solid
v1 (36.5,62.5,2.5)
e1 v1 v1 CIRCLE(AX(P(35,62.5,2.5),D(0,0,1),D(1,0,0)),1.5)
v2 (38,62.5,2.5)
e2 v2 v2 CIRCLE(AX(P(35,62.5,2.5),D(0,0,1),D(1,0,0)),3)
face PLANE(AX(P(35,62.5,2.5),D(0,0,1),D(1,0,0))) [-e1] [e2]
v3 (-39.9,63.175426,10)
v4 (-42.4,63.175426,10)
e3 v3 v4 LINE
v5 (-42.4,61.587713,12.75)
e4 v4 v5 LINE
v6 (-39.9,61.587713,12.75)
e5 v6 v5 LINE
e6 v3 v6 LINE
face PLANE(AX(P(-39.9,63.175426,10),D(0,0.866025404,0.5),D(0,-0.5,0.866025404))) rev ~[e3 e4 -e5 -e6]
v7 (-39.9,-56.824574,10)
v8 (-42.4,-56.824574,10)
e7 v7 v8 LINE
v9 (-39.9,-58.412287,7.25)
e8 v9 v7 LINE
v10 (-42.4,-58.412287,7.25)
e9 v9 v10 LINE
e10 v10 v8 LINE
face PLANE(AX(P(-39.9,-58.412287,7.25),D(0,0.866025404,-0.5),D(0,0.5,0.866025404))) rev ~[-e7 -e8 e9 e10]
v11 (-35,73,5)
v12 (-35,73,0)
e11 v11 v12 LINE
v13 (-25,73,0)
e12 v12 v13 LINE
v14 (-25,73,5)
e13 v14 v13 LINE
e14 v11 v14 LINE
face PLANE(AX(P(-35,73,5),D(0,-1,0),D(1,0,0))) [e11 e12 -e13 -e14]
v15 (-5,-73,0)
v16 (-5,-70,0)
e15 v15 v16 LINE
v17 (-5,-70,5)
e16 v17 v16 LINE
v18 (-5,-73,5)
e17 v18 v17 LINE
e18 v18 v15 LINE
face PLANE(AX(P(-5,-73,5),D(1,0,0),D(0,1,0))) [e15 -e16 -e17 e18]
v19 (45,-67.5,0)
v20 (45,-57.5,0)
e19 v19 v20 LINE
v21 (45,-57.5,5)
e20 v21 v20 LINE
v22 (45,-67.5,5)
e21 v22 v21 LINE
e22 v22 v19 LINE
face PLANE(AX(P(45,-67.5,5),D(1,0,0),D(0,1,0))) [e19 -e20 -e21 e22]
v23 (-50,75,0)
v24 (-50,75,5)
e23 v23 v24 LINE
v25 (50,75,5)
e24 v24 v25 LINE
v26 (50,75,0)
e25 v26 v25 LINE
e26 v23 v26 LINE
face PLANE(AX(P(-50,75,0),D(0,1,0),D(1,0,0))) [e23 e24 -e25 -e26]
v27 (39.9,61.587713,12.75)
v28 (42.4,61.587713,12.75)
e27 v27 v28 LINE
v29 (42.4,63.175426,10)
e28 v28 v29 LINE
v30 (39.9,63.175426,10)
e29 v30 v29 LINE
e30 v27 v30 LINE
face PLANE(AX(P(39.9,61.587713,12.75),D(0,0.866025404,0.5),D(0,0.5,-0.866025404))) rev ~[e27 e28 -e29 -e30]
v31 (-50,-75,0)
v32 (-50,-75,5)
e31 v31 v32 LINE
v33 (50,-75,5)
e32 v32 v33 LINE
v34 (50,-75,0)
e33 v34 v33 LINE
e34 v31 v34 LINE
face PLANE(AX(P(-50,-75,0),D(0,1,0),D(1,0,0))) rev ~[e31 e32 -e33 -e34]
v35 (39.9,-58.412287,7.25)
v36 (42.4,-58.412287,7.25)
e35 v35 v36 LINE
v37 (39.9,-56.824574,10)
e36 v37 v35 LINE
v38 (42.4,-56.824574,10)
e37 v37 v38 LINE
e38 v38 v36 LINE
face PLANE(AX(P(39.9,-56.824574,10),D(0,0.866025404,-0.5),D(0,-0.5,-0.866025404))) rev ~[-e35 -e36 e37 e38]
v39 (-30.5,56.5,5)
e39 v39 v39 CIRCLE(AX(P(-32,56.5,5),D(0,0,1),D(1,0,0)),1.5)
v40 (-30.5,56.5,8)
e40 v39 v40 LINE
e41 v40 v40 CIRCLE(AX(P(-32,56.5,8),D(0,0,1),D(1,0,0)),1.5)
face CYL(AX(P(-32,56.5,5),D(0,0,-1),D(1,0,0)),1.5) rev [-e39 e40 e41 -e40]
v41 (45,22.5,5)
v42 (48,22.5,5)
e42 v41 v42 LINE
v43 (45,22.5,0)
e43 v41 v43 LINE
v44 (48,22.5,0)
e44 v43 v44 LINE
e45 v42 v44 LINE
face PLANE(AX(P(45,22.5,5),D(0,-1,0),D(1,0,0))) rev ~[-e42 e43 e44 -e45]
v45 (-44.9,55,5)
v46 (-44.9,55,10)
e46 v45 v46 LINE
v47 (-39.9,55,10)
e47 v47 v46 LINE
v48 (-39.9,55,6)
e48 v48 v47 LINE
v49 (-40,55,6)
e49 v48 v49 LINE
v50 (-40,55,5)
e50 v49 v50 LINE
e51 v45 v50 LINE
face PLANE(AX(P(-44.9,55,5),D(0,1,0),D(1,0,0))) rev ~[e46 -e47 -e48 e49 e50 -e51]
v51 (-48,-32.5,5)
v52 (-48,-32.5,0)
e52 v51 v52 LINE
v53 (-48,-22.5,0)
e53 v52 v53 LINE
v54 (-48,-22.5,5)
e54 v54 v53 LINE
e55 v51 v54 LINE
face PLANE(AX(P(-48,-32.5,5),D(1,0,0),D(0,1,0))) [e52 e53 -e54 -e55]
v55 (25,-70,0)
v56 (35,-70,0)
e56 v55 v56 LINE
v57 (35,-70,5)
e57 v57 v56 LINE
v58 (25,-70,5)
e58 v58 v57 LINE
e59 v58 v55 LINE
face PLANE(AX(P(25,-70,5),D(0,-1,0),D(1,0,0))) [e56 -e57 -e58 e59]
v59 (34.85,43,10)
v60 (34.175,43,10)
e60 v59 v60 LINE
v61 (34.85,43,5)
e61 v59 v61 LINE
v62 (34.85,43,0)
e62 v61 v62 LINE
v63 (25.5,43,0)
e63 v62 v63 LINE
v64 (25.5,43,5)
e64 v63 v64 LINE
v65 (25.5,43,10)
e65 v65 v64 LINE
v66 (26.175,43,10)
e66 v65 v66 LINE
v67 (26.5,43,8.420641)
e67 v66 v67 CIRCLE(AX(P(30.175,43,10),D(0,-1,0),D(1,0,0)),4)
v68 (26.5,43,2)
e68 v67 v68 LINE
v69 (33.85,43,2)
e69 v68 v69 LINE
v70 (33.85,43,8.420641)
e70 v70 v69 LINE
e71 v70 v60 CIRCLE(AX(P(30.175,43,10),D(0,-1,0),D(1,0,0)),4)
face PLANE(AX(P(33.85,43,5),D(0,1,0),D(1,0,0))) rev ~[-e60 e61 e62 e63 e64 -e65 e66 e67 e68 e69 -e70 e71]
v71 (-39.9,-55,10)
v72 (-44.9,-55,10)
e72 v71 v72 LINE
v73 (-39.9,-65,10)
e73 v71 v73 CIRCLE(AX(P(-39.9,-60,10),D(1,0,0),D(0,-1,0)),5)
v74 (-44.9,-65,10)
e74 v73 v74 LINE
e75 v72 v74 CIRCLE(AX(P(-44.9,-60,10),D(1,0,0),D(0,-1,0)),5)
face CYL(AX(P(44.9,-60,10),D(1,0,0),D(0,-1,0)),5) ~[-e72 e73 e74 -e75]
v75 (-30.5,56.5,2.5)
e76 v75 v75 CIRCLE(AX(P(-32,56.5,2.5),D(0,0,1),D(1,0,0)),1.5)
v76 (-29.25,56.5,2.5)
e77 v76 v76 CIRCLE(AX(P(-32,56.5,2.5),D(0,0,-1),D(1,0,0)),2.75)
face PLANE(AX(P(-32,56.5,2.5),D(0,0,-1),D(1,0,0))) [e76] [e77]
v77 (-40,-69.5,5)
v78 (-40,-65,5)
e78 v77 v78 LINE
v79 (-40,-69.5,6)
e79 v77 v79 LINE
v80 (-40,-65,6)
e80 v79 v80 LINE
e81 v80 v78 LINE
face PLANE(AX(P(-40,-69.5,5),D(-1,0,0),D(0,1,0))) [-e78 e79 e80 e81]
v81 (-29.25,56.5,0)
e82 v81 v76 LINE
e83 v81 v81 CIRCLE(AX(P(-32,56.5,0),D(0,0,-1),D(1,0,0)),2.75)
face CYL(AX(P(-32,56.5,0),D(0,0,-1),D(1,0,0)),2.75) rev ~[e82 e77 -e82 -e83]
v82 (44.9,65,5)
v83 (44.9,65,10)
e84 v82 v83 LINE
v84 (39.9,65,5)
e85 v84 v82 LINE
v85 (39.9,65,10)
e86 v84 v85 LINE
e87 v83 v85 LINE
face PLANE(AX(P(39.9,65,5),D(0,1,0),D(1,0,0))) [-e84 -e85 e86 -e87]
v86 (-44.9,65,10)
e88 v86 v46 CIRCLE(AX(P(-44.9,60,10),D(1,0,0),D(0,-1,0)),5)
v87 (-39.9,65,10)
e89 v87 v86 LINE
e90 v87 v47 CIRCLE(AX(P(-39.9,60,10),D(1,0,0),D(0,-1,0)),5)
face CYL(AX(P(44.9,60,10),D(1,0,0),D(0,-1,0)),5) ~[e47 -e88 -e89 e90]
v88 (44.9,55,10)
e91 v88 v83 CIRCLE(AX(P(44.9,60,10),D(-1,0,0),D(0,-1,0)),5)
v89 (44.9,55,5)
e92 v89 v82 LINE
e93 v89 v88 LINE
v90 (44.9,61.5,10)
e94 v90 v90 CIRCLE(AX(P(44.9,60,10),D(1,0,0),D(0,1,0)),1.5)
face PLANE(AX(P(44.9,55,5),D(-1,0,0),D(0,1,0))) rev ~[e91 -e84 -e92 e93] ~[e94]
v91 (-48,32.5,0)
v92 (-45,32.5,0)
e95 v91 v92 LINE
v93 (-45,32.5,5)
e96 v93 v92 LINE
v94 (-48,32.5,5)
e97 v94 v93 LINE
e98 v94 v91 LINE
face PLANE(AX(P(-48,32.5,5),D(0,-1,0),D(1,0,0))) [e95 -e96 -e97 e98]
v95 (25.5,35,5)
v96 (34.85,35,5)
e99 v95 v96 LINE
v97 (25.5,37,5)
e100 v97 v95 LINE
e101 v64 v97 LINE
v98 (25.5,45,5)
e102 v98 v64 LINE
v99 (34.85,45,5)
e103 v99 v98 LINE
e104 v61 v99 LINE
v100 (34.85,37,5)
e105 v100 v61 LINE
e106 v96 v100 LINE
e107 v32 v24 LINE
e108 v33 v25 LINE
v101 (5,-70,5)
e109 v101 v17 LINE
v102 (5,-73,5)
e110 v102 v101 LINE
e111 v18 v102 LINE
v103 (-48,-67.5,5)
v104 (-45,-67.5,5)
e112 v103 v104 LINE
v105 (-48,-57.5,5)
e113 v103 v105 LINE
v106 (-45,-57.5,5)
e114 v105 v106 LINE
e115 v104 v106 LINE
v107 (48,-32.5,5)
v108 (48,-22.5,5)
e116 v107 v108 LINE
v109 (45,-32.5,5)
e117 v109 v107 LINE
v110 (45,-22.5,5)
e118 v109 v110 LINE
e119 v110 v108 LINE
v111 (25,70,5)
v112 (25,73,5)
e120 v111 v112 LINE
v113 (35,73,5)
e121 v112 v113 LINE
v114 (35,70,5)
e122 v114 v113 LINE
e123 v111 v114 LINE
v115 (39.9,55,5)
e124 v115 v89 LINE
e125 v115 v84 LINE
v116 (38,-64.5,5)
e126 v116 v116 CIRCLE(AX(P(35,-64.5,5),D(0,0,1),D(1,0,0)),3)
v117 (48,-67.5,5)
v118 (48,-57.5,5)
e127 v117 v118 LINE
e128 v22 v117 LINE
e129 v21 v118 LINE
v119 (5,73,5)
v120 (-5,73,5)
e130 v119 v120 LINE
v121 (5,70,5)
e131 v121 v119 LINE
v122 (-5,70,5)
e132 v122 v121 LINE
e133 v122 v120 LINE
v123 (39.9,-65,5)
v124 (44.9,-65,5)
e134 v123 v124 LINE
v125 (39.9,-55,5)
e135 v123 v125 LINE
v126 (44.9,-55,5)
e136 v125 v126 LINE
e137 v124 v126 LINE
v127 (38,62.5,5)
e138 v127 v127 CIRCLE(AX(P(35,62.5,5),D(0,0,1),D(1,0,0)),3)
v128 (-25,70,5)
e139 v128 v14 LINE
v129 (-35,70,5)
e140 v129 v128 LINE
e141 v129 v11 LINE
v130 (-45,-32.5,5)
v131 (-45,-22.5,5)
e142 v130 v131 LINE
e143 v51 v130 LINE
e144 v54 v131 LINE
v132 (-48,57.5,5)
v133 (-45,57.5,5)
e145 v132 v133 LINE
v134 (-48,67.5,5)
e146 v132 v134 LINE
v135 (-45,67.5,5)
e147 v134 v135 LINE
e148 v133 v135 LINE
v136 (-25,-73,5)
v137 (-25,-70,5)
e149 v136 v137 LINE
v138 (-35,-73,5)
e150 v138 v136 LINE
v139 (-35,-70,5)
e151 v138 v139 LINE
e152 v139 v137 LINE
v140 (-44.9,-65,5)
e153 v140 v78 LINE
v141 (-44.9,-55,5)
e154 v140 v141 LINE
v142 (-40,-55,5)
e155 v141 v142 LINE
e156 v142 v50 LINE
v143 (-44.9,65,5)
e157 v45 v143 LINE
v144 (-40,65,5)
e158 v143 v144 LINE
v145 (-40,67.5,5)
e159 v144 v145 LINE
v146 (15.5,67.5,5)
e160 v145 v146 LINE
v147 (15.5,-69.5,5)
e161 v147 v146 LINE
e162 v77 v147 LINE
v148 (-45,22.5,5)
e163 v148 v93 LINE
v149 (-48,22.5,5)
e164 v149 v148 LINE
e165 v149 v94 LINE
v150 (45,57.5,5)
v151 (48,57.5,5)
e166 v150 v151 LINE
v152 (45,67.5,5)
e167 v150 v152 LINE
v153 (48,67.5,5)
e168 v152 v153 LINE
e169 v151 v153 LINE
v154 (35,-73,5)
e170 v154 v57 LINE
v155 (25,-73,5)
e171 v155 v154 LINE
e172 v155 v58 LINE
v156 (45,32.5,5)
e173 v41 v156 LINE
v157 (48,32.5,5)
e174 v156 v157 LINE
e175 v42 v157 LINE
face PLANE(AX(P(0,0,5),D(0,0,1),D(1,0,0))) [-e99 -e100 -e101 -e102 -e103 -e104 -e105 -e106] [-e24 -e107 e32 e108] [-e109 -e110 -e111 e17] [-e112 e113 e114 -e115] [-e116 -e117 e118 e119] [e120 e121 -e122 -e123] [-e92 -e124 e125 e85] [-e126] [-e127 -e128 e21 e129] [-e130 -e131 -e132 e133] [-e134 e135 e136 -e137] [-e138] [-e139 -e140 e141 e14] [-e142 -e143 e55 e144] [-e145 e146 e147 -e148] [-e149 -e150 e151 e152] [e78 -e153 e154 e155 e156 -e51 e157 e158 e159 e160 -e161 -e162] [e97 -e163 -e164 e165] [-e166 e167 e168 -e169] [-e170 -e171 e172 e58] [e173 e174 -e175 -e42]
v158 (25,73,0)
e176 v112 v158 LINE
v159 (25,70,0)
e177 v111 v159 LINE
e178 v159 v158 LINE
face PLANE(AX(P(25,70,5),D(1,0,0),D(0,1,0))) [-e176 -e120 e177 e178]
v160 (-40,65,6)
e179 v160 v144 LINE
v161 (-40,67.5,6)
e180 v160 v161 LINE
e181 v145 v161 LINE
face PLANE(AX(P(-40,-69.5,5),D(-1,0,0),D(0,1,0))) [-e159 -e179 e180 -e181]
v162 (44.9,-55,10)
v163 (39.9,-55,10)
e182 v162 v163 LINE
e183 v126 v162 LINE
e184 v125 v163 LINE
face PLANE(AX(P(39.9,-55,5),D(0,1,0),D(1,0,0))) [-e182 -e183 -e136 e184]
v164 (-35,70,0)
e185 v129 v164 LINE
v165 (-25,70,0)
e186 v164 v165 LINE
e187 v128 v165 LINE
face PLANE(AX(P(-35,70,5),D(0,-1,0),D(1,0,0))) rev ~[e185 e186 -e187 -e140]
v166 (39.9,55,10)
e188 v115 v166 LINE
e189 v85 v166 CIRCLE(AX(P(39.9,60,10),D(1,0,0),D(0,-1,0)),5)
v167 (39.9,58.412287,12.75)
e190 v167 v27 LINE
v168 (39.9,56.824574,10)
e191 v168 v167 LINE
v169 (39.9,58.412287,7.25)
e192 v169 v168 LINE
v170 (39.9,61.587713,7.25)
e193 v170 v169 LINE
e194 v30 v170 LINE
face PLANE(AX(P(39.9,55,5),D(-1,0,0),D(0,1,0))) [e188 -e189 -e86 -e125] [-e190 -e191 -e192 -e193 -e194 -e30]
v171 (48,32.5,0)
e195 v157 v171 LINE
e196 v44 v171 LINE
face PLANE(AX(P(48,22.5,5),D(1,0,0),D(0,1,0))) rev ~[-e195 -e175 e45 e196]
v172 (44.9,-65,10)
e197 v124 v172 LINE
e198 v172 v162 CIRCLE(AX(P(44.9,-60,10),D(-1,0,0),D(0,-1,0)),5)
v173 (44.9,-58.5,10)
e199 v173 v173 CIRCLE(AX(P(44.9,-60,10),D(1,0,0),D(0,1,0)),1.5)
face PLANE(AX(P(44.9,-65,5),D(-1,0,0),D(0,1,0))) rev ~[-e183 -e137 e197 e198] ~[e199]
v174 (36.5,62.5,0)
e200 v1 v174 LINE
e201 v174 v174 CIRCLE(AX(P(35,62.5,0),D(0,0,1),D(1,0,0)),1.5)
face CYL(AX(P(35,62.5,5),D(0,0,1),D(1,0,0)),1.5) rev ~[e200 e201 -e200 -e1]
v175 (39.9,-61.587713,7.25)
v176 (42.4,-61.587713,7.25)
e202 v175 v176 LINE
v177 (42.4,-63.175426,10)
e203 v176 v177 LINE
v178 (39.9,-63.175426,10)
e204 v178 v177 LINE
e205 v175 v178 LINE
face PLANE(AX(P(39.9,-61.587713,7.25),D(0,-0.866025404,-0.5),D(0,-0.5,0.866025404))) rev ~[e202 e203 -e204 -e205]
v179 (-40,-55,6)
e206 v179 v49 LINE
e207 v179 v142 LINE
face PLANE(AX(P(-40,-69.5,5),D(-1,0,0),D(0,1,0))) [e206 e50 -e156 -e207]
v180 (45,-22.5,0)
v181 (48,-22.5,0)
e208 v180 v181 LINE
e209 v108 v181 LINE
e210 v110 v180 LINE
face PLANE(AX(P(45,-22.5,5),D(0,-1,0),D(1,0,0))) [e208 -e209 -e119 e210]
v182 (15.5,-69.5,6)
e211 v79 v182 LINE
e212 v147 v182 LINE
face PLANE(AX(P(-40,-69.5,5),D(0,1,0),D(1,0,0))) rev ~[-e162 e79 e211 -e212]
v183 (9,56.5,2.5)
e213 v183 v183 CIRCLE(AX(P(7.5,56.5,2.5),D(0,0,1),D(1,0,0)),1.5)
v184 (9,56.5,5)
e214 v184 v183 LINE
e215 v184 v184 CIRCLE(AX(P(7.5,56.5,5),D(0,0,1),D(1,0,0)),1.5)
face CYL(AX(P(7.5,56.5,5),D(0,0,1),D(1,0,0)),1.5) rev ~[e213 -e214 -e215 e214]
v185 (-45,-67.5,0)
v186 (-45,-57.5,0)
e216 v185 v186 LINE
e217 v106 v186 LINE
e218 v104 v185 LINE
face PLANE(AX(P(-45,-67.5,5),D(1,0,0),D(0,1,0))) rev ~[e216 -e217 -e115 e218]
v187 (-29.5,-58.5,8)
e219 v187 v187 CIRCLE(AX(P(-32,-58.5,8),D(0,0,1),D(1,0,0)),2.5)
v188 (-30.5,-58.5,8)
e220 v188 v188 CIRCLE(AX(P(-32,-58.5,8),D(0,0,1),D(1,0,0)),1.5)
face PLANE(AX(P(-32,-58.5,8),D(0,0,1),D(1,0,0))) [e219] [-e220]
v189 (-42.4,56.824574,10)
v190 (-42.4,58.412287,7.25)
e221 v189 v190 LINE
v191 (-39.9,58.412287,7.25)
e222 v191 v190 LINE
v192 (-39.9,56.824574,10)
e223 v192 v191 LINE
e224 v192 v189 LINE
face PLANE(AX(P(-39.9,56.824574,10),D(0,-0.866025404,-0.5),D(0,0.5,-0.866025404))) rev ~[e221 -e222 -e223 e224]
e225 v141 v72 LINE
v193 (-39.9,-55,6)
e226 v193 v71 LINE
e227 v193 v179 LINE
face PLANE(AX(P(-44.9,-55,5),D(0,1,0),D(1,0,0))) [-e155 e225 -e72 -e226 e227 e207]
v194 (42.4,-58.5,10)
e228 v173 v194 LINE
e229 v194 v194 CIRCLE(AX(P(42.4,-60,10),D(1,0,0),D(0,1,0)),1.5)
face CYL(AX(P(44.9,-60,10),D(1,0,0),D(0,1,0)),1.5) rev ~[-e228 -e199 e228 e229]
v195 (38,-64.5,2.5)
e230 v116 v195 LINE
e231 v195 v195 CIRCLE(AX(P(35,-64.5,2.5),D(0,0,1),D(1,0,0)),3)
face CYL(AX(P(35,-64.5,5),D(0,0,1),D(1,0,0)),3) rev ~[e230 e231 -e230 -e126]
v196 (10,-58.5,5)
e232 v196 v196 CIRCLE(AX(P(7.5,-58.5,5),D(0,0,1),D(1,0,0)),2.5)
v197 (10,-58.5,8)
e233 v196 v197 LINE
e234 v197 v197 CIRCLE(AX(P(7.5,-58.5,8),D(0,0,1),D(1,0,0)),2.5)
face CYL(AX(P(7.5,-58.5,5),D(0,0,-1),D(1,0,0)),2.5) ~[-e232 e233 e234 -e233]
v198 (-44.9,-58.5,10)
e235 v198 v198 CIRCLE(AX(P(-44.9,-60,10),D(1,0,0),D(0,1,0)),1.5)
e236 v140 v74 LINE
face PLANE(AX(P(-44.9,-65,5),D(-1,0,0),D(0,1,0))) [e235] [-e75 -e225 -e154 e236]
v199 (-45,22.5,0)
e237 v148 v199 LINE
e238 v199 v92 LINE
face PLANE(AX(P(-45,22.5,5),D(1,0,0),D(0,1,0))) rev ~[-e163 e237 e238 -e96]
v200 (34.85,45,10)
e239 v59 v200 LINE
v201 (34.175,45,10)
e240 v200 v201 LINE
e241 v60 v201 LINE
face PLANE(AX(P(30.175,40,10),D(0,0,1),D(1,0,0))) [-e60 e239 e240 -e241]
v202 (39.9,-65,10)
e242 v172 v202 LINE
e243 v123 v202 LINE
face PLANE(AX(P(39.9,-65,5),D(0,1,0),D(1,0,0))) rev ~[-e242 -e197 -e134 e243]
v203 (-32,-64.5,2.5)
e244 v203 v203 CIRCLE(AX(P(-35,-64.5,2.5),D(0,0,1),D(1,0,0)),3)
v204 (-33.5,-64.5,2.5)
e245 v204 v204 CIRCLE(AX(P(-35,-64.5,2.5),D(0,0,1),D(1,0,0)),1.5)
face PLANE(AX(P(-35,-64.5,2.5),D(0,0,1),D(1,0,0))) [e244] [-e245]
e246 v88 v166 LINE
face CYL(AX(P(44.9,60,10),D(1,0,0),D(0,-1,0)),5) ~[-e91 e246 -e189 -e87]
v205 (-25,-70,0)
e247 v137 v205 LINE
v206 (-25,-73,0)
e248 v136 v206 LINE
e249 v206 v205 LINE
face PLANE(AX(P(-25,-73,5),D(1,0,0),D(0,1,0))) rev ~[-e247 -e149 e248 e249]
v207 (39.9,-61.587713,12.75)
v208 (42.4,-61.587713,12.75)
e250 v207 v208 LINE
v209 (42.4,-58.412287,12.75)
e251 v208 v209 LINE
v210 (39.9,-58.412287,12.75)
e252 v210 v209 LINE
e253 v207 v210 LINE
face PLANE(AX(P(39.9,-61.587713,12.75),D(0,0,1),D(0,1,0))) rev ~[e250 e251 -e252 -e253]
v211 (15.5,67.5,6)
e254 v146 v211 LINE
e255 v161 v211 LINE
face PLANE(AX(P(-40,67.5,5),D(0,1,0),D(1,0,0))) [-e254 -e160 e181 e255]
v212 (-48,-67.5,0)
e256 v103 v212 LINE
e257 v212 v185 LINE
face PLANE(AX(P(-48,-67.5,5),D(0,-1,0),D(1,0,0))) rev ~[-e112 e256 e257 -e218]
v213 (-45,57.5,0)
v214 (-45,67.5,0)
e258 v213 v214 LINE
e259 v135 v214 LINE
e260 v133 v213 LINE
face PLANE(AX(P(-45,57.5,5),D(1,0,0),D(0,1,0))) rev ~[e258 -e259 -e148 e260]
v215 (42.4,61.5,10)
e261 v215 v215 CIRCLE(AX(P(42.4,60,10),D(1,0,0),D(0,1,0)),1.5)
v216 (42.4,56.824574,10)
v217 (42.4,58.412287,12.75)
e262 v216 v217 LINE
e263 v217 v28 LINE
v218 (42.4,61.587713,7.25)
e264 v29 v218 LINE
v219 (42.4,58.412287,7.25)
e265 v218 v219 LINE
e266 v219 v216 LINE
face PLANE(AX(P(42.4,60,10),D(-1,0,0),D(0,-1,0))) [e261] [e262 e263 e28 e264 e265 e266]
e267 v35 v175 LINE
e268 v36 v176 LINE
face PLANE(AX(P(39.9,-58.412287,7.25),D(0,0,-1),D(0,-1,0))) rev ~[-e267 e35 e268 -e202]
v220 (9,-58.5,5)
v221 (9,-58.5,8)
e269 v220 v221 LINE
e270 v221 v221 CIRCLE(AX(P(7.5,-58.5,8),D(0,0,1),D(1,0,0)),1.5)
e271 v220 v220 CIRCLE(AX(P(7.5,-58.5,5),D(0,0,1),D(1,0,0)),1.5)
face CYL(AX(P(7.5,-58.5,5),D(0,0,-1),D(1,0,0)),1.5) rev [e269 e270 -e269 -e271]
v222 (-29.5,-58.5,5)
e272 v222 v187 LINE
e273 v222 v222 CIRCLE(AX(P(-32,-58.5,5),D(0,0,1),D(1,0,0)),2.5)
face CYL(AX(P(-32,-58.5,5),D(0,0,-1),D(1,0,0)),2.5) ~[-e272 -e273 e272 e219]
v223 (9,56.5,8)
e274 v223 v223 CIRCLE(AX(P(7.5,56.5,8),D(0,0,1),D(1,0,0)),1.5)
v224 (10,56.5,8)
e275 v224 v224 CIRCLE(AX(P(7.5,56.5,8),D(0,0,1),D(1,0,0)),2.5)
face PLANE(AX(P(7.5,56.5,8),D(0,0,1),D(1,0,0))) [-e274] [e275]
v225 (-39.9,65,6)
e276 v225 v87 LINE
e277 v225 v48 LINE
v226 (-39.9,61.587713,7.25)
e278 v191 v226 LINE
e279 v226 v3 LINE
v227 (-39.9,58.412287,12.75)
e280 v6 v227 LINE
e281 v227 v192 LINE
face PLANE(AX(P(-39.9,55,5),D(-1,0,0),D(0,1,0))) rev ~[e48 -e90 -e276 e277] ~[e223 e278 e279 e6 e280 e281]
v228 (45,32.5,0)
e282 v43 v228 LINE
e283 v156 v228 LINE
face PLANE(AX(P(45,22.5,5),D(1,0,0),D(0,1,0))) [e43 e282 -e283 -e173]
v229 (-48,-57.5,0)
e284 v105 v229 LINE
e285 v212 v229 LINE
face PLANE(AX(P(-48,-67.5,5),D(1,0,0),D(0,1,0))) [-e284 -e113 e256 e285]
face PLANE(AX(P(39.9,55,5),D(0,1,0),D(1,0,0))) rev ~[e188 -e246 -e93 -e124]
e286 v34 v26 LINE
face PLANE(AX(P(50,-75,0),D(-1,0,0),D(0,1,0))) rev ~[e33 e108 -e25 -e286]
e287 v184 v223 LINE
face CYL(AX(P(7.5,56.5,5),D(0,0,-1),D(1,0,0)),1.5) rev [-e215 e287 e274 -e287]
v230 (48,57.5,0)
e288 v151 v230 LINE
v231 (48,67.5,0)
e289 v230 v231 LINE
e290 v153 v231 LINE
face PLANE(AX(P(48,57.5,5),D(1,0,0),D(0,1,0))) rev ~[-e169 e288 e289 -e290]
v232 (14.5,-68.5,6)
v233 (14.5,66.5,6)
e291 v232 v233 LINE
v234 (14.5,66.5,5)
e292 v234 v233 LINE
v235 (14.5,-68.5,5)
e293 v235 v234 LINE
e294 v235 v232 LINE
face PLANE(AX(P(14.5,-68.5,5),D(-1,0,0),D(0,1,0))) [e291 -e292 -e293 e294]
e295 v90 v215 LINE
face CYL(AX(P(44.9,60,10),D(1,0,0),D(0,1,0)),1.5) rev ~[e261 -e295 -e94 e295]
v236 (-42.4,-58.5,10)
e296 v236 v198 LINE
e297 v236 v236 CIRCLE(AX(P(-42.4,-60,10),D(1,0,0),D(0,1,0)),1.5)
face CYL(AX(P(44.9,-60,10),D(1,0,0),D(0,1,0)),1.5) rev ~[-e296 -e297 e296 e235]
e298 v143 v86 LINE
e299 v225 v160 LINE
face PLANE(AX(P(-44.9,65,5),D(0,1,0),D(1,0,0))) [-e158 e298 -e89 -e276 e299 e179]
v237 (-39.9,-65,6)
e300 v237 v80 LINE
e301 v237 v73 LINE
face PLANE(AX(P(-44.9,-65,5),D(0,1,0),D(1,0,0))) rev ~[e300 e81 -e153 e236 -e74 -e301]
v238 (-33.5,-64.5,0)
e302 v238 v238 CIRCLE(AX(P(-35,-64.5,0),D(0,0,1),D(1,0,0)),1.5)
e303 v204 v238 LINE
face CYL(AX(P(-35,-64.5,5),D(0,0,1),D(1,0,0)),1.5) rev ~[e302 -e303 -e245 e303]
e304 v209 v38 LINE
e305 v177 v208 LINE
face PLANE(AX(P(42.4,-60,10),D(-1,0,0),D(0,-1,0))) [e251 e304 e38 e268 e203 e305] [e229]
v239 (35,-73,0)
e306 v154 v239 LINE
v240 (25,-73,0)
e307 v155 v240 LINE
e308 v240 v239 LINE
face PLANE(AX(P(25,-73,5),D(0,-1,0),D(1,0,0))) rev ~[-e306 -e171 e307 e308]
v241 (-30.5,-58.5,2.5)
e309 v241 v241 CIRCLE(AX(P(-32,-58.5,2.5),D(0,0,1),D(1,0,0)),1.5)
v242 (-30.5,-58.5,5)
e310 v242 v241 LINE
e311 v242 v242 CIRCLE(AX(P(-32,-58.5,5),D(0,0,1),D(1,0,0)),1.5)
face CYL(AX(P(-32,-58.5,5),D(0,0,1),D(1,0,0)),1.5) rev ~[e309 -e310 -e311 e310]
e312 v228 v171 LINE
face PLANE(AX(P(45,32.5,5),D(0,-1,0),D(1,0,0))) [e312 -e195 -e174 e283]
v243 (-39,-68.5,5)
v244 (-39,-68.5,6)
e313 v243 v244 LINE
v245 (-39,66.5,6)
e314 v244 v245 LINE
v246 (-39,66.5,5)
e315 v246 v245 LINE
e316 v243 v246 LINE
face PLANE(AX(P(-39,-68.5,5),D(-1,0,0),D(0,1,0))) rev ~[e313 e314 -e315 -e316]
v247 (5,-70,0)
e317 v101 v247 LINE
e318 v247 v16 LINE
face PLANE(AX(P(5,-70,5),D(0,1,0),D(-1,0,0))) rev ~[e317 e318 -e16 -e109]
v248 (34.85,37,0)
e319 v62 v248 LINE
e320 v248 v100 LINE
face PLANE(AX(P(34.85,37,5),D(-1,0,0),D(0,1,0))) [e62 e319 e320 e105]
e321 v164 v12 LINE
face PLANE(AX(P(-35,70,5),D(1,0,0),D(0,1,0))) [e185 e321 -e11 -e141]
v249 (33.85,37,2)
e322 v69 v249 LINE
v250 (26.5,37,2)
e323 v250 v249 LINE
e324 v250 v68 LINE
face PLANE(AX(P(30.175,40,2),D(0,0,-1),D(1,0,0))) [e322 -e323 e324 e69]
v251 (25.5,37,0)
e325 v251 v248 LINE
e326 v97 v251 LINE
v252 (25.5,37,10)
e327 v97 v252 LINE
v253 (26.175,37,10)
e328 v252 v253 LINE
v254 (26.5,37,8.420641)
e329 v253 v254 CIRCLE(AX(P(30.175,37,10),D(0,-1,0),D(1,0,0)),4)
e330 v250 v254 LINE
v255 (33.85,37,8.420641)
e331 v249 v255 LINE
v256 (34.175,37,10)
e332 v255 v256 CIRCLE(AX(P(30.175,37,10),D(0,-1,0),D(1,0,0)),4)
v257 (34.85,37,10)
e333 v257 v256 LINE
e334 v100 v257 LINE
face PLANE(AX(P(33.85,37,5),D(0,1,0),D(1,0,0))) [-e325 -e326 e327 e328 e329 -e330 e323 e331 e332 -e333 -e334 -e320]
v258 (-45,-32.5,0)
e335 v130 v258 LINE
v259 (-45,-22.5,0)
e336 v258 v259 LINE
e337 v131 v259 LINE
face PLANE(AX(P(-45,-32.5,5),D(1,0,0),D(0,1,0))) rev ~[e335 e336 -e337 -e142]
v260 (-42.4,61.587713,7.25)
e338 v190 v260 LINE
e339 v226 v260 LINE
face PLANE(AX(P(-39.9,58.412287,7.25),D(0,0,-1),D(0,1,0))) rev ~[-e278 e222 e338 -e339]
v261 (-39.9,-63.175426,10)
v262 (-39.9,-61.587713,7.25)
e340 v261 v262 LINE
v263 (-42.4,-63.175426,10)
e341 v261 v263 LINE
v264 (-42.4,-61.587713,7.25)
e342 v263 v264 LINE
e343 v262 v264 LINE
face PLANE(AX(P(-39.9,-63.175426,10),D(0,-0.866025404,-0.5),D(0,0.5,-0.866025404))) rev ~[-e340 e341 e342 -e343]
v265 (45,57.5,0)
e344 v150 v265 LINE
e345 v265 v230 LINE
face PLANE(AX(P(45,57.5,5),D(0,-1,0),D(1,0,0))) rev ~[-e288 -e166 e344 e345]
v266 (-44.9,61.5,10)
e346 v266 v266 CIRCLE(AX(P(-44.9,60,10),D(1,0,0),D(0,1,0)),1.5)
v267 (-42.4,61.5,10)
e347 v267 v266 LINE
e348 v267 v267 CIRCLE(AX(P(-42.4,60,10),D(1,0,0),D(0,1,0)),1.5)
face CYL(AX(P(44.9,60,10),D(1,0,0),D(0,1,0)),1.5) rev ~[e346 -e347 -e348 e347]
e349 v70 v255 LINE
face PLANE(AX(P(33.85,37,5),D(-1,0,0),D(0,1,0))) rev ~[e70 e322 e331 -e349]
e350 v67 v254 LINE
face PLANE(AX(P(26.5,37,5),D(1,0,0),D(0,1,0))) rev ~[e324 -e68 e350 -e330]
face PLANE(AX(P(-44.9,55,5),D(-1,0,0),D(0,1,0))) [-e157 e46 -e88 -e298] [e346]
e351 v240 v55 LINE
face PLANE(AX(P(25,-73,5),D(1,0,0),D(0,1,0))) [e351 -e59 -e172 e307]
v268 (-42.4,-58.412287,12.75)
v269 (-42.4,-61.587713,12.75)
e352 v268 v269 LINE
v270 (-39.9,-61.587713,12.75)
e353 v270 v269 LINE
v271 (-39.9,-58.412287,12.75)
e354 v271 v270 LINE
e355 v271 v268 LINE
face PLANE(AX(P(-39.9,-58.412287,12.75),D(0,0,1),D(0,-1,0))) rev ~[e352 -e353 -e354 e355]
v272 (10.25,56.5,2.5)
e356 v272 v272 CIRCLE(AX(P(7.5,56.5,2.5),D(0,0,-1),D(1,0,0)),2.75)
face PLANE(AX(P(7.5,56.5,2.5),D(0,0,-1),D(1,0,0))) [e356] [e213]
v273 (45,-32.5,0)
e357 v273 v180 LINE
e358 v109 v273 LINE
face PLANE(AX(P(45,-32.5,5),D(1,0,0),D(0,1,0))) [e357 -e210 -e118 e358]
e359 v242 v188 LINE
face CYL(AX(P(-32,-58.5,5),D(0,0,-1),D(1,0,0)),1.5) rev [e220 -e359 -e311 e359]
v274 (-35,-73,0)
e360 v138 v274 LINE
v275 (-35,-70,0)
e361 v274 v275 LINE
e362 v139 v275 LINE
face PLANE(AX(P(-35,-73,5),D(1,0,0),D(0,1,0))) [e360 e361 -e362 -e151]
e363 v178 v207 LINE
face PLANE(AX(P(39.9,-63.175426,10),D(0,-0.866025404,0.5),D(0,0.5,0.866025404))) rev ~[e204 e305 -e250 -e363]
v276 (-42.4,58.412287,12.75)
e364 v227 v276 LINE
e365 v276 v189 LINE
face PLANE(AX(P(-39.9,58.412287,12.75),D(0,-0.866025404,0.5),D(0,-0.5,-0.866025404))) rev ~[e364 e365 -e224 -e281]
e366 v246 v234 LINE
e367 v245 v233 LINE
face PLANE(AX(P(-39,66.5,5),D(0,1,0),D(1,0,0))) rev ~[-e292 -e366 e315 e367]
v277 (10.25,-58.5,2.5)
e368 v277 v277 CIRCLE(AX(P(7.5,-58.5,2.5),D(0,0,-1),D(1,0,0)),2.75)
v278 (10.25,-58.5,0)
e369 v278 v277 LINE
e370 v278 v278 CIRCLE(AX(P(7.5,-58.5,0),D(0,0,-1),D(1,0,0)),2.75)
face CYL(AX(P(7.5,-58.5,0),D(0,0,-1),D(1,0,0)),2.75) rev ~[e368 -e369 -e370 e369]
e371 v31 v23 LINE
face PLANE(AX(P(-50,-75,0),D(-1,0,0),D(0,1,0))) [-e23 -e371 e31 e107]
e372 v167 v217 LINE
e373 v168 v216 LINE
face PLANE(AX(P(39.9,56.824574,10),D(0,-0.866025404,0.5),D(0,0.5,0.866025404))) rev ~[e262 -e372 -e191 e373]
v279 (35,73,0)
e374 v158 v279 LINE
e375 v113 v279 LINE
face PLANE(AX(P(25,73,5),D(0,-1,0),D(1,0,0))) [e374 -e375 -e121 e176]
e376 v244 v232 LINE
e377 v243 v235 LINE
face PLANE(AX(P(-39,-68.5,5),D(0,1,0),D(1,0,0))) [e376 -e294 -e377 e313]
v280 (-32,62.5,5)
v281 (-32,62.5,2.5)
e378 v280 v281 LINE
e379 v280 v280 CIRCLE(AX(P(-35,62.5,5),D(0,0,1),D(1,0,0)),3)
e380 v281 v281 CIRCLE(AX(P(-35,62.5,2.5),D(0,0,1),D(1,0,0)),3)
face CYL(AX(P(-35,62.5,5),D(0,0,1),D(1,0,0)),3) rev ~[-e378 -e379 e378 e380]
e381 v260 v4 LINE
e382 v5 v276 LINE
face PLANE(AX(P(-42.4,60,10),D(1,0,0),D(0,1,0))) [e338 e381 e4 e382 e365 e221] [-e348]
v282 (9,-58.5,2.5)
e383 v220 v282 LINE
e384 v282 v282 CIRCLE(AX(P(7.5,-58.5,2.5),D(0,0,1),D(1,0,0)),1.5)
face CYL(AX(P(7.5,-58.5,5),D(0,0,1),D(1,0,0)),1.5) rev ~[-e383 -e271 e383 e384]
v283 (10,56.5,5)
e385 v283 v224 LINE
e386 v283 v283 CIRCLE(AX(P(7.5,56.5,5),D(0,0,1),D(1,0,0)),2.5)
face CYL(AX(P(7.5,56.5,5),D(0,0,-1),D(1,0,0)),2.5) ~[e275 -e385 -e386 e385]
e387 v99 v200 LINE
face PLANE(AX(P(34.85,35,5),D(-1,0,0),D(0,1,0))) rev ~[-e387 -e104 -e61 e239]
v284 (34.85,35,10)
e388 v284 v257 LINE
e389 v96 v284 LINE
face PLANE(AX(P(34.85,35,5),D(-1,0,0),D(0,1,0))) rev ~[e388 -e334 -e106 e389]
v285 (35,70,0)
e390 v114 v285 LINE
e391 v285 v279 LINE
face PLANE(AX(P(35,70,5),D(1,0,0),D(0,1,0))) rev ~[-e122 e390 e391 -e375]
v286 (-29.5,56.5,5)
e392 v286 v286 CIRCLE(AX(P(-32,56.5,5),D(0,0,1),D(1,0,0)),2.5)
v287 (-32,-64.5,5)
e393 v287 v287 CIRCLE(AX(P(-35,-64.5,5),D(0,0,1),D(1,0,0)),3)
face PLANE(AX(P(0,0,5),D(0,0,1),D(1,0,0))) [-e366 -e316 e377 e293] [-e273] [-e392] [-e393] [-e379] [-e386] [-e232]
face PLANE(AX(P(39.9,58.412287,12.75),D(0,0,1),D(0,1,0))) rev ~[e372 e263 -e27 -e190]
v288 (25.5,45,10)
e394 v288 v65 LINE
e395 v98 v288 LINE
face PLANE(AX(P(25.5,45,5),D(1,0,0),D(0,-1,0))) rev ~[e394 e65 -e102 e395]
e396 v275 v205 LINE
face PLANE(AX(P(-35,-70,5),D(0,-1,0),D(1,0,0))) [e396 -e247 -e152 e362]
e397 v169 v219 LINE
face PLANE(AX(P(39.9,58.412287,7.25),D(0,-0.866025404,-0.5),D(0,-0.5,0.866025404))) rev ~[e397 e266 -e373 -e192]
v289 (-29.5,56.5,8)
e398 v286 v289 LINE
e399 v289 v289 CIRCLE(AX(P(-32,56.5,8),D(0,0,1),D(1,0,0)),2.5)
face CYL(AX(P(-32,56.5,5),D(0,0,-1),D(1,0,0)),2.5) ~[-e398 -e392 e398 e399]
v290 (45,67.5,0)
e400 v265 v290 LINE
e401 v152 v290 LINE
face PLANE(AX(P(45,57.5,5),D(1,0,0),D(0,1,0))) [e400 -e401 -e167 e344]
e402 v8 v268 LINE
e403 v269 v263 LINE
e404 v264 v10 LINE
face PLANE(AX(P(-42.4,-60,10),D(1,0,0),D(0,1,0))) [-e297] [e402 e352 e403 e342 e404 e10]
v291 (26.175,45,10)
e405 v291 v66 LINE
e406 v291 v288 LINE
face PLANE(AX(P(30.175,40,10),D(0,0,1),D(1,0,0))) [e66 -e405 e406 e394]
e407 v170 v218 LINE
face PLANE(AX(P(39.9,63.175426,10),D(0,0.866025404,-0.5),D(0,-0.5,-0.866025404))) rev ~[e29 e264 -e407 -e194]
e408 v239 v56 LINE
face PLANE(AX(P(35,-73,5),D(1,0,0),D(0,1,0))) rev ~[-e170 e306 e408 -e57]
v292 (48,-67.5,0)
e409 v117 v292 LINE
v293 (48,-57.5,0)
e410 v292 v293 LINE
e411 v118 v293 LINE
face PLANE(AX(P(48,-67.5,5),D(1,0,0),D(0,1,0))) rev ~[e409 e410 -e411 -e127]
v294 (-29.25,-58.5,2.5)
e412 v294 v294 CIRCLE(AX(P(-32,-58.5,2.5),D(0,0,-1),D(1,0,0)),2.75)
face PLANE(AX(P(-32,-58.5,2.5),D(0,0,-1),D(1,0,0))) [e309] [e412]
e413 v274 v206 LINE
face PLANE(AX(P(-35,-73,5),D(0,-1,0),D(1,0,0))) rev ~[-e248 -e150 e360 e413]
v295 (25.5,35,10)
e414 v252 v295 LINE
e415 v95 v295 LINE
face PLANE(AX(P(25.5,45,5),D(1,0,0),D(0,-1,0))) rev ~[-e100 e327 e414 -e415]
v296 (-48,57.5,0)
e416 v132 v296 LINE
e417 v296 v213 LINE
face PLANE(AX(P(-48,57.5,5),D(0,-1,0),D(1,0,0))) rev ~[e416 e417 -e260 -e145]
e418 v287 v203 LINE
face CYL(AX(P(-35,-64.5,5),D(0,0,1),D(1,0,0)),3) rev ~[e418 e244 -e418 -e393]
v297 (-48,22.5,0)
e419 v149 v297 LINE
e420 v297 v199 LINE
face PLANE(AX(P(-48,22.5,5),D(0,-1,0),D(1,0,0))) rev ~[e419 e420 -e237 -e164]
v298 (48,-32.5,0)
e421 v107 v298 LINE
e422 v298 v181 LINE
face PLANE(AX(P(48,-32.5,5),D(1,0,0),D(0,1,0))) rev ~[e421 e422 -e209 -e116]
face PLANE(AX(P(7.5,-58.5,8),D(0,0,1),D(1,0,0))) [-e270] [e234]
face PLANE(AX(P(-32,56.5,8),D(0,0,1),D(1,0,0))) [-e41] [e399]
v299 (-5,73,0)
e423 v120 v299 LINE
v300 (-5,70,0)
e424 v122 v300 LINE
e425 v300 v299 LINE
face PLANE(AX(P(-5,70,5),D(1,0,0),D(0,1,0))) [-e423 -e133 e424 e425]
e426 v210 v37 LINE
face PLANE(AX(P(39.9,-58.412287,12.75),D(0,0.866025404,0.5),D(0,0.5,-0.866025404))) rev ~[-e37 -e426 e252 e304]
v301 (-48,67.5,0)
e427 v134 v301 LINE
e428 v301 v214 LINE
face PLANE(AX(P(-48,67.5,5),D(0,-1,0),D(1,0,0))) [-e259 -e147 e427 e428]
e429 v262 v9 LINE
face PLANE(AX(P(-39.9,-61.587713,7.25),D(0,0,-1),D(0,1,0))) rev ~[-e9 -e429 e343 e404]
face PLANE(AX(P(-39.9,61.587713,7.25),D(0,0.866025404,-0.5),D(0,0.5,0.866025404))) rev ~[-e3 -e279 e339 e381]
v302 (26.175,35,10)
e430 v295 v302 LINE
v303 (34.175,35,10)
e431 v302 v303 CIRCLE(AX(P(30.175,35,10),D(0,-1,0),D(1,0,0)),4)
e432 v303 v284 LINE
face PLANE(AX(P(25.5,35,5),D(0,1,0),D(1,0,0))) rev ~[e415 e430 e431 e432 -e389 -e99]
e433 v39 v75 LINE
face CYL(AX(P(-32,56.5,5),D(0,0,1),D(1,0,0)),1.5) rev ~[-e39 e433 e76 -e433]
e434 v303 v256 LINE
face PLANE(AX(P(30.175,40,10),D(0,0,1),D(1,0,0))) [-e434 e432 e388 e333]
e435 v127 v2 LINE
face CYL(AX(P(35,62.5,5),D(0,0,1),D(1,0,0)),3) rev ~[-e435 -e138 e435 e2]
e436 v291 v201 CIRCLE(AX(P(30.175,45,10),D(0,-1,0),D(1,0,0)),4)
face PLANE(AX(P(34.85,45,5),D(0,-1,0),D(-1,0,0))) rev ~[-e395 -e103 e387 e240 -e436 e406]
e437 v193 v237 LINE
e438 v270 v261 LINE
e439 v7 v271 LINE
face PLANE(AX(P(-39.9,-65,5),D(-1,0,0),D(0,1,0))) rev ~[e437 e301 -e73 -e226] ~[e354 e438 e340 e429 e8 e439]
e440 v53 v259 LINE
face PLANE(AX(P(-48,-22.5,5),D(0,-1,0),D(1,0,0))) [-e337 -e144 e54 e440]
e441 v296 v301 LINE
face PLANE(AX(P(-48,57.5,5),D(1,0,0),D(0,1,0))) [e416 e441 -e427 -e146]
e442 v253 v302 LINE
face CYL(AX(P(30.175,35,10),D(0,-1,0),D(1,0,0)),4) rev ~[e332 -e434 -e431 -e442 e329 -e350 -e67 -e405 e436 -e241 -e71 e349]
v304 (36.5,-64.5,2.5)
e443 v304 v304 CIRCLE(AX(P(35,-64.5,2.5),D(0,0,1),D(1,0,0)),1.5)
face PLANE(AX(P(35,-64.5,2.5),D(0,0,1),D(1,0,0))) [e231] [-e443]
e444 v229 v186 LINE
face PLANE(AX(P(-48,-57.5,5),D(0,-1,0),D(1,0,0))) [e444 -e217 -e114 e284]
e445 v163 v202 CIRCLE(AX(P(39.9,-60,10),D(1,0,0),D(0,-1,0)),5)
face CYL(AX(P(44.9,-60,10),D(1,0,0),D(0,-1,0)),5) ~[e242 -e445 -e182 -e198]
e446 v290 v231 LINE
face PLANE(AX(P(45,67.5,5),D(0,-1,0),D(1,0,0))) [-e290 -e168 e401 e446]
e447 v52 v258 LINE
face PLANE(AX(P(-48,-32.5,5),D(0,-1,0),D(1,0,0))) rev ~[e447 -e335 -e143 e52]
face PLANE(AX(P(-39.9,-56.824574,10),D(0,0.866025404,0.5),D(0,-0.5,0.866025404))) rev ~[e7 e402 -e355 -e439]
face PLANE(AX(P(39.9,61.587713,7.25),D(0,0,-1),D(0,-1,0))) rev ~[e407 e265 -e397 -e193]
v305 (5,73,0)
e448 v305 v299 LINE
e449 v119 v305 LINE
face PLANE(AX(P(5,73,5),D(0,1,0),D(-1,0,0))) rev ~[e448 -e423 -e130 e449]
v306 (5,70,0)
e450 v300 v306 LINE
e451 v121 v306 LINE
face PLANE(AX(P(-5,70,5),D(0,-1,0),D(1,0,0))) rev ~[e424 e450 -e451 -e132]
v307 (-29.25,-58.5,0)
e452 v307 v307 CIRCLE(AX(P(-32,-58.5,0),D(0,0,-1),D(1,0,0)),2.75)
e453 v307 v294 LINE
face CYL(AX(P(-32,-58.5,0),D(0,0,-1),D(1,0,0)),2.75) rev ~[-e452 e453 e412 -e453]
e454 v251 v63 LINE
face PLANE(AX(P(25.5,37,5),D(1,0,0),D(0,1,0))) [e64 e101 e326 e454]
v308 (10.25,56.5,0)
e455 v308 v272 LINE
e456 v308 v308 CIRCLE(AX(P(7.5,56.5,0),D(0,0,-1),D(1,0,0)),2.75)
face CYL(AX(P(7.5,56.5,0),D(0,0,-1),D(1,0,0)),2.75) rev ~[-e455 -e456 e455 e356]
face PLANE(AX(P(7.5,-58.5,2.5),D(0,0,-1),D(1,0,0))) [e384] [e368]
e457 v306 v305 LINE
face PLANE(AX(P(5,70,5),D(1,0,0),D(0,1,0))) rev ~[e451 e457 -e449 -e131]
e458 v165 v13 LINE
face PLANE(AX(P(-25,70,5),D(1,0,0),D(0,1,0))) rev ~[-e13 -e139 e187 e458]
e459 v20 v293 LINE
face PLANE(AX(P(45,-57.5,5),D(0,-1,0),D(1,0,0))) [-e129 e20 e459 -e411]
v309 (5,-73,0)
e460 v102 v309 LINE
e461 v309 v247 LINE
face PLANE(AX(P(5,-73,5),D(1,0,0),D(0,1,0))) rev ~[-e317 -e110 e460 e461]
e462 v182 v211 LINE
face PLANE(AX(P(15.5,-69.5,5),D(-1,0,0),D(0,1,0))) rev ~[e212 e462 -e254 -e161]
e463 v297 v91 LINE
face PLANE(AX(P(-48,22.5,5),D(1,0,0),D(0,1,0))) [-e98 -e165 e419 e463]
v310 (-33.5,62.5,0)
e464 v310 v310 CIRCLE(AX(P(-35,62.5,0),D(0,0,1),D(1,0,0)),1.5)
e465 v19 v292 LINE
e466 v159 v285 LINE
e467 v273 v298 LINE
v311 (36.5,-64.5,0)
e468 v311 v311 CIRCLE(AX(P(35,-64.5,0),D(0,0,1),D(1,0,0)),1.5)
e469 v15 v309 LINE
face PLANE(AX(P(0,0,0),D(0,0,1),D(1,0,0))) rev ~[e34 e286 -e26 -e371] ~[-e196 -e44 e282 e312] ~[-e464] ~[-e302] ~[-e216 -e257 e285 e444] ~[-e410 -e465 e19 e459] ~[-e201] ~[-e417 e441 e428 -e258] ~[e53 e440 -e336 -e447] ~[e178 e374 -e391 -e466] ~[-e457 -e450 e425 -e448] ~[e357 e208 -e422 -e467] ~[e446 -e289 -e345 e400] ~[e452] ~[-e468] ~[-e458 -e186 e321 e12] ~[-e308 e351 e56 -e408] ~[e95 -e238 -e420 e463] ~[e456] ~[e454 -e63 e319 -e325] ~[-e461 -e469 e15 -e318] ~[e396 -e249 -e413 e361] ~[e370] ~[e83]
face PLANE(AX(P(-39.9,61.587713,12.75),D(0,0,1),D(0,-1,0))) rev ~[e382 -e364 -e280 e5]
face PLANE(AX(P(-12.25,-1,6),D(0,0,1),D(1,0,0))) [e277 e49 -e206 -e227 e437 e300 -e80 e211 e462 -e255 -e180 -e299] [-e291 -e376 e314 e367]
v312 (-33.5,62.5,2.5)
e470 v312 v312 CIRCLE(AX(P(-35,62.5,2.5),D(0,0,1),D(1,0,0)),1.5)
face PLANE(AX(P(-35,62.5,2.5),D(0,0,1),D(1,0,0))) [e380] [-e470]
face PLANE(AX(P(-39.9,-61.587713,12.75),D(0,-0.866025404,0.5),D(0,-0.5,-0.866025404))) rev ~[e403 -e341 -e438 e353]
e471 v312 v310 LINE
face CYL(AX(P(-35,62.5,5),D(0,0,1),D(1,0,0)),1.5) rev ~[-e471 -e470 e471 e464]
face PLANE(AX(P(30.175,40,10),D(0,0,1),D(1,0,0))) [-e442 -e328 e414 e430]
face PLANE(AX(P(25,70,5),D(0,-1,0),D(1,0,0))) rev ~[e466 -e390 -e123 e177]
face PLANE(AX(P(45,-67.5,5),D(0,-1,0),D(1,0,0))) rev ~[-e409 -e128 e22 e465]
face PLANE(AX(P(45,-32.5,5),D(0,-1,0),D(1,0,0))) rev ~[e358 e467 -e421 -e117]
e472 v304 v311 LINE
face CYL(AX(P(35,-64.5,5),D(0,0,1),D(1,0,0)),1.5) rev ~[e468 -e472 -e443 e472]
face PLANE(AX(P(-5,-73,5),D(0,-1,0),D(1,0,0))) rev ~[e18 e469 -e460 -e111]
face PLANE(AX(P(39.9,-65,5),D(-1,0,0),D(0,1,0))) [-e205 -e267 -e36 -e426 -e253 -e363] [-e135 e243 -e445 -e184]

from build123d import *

# Parameters (mm, degrees)
F0_W      = 100
F0_H      = 150
F1_DEPTH  = 5
F2_R      = 1.5
F3_DEPTH  = 25
F4_R      = 2.5
F4_R_2    = 1.5
F5_DEPTH  = 3
F6_R      = 2.75
F7_DEPTH  = 2.5
F8_W      = 3
F8_H      = 10
F8_W_2    = 5
F8_H_2    = 3
F8_W_3    = 10
F9_DEPTH  = 25
F10_W     = 55.5
F10_H     = 137
F10_W_2   = 53.5
F10_H_2   = 135
F11_DEPTH = 1
F12_W     = 1
F12_H     = 6
F13_DEPTH = 5
F14_DEPTH = 12.5
F15_R     = 4
F16_DEPTH = 25
F17_W     = 9.35
F17_H     = 6
F18_DEPTH = 2
F19_W     = 5
F19_H     = 10
F20_DEPTH = 12
F21_R     = 1.5
F22_DEPTH = 150
F24_DEPTH = 2.5
F26_DEPTH = 2.5
F28_DEPTH = 150
F29_R     = 1.5
F30_DEPTH = 25
F31_R     = 3
F32_DEPTH = 2.5


# Not quite as in the source:
# - a feature names something its author has since deleted; it is built from what else it names


with BuildPart() as f1:
    # F0 (on Top) → F1 (new body)
    with BuildSketch(Plane.XY):
        Rectangle(F0_W, F0_H)
    extrude(amount=F1_DEPTH)

    # F2 (on face) → F3 (cut)
    with BuildSketch(Plane.XY.offset(5)):
        with Locations((-32, 56.5)):
            Circle(F2_R)
        with Locations((7.5, 56.5)):
            Circle(F2_R)
        with Locations((-32, -58.5)):
            Circle(F2_R)
        with Locations((7.5, -58.5)):
            Circle(F2_R)
    extrude(amount=-F3_DEPTH, mode=Mode.SUBTRACT)

    # F4 (on face) → F5 (join)
    with BuildSketch(Plane.XY.offset(5)):
        with Locations((-32, -58.5)):
            Circle(F4_R)
        with Locations((-32, -58.5)):
            Circle(F4_R_2, mode=Mode.SUBTRACT)
        with Locations((7.5, -58.5)):
            Circle(F4_R)
        with Locations((7.5, -58.5)):
            Circle(F4_R_2, mode=Mode.SUBTRACT)
        with Locations((7.5, 56.5)):
            Circle(F4_R)
        with Locations((7.5, 56.5)):
            Circle(F4_R_2, mode=Mode.SUBTRACT)
        with Locations((-32, 56.5)):
            Circle(F4_R)
        with Locations((-32, 56.5)):
            Circle(F4_R_2, mode=Mode.SUBTRACT)
    extrude(amount=F5_DEPTH)

    # F6 (on face) → F7 (cut)
    with BuildSketch(Plane(origin=(0, 0, 0), x_dir=(1, 0, 0), z_dir=(0, 0, -1))):
        with Locations((-32, 58.5)):
            Circle(F6_R)
        with Locations((7.5, 58.5)):
            Circle(F6_R)
        with Locations((-32, -56.5)):
            Circle(F6_R)
        with Locations((7.5, -56.5)):
            Circle(F6_R)
    extrude(amount=-F7_DEPTH, mode=Mode.SUBTRACT)

    # F8 (on face) → F9 (cut)
    with BuildSketch(Plane.XY.offset(5)):
        with Locations((-46.5, 62.5)):
            Rectangle(F8_W, F8_H)
        with Locations((-46.5, 27.5)):
            Rectangle(F8_W, F8_H)
        with Locations((-46.5, -27.5)):
            Rectangle(F8_W, F8_H)
        with Locations((-46.5, -62.5)):
            Rectangle(F8_W, F8_H)
        with Locations((2.5, 71.5)):
            Rectangle(F8_W_2, F8_H_2)
        with Locations((-2.5, 71.5)):
            Rectangle(F8_W_2, F8_H_2)
        with Locations((2.5, -71.5)):
            Rectangle(F8_W_2, F8_H_2)
        with Locations((-2.5, -71.5)):
            Rectangle(F8_W_2, F8_H_2)
        with Locations((46.5, 62.5)):
            Rectangle(F8_W, F8_H)
        with Locations((46.5, -62.5)):
            Rectangle(F8_W, F8_H)
        with Locations((46.5, -27.5)):
            Rectangle(F8_W, F8_H)
        with Locations((46.5, 27.5)):
            Rectangle(F8_W, F8_H)
        with Locations((-30, 71.5)):
            Rectangle(F8_W_3, F8_H_2)
        with Locations((30, 71.5)):
            Rectangle(F8_W_3, F8_H_2)
        with Locations((30, -71.5)):
            Rectangle(F8_W_3, F8_H_2)
        with Locations((-30, -71.5)):
            Rectangle(F8_W_3, F8_H_2)
    extrude(amount=-F9_DEPTH, mode=Mode.SUBTRACT)

    # F10 (on face) → F11 (join)
    with BuildSketch(Plane.XY.offset(5)):
        with Locations((-12.25, -1)):
            Rectangle(F10_W, F10_H)
        with Locations((-12.25, -1)):
            Rectangle(F10_W_2, F10_H_2, mode=Mode.SUBTRACT)
    extrude(amount=F11_DEPTH)

    # F12 (on face) → F13 (join)
    with BuildSketch(Plane.XY.offset(5)):
        Polygon((34.85, 45), (25.5, 45), (25.5, 43), (26.5, 43), (26.5, 37), (25.5, 37), (25.5, 35), (34.85, 35), (34.85, 37), (33.85, 37), (33.85, 43), (34.85, 43), align=None)
        with Locations((26, 40)):
            Rectangle(F12_W, F12_H)
        with Locations((34.35, 40)):
            Rectangle(F12_W, F12_H)
    extrude(amount=F13_DEPTH)

    # F12 (on face) → F14 (cut, symmetric)
    with BuildSketch(Plane.XY.offset(5)):
        with Locations((34.35, 40)):
            Rectangle(F12_W, F12_H)
        with Locations((26, 40)):
            Rectangle(F12_W, F12_H)
    extrude(amount=F14_DEPTH, both=True, mode=Mode.SUBTRACT)

    # F15 (on face) → F16 (cut)
    with BuildSketch(Plane.XZ.offset(-35)):
        with Locations((30.175, 10)):
            Circle(F15_R)
    extrude(amount=-F16_DEPTH, mode=Mode.SUBTRACT)

    # F17 (on face) → F18 (cut)
    with BuildSketch(Plane(origin=(0, 0, 0), x_dir=(1, 0, 0), z_dir=(0, 0, -1))):
        with Locations((30.175, -40)):
            Rectangle(F17_W, F17_H)
    extrude(amount=-F18_DEPTH, mode=Mode.SUBTRACT)

    # F19 (on face) → F20 (join)
    with BuildSketch(Plane.XY.offset(5)):
        with Locations((42.4, 60)):
            Rectangle(F19_W, F19_H)
        with Locations((-42.4, 60)):
            Rectangle(F19_W, F19_H)
        with Locations((-42.4, -60)):
            Rectangle(F19_W, F19_H)
        with Locations((42.4, -60)):
            Rectangle(F19_W, F19_H)
    extrude(amount=F20_DEPTH)

    # F21 (on face) → F22 (cut)
    with BuildSketch(Plane.YZ.offset(44.9)):
        with Locations((-60, 10)):
            Circle(F21_R)
        with Locations((60, 10)):
            Circle(F21_R)
    extrude(amount=-F22_DEPTH, mode=Mode.SUBTRACT)

    # F23 (on face) → F24 (cut)
    with BuildSketch(Plane(origin=(39.9, 0, 0), x_dir=(0, -1, 0), z_dir=(-1, 0, 0))):
        Polygon((-58.4122867597, 12.75), (-61.5877132403, 12.75), (-63.1754264805, 10), (-61.5877132403, 7.25), (-58.4122867597, 7.25), (-56.8245735195, 10), align=None)
        Polygon((61.5877132403, 7.25), (63.1754264805, 10), (61.5877132403, 12.75), (58.4122867597, 12.75), (56.8245735195, 10), (58.4122867597, 7.25), align=None)
    extrude(amount=-F24_DEPTH, mode=Mode.SUBTRACT)

    # F25 (on face) → F26 (cut)
    with BuildSketch(Plane.YZ.offset(-39.9)):
        Polygon((-58.4122867597, 12.75), (-61.5877132403, 12.75), (-63.1754264805, 10), (-61.5877132403, 7.25), (-58.4122867597, 7.25), (-56.8245735195, 10), align=None)
        Polygon((61.5877132403, 7.25), (63.1754264805, 10), (61.5877132403, 12.75), (58.4122867597, 12.75), (56.8245735195, 10), (58.4122867597, 7.25), align=None)
    extrude(amount=-F26_DEPTH, mode=Mode.SUBTRACT)

    # F27 (on face) → F28 (cut)
    with BuildSketch(Plane.YZ.offset(44.9)):
        with BuildLine():
            ThreePointArc((-65, 10), (-60, 15), (-55, 10))
            Line((-55, 10), (-55, 17))
            Line((-55, 17), (-65, 17))
            Line((-65, 17), (-65, 10))
        make_face()
        with BuildLine():
            ThreePointArc((55, 10), (60, 15), (65, 10))
            Line((65, 10), (65, 17))
            Line((65, 17), (55, 17))
            Line((55, 17), (55, 10))
        make_face()
    extrude(amount=-F28_DEPTH, mode=Mode.SUBTRACT)

    # F29 (on face) → F30 (cut)
    with BuildSketch(Plane.XY.offset(5)):
        with Locations((-35, 62.5)):
            Circle(F29_R)
        with Locations((35, 62.5)):
            Circle(F29_R)
        with Locations((-35, -64.5)):
            Circle(F29_R)
        with Locations((35, -64.5)):
            Circle(F29_R)
    extrude(amount=-F30_DEPTH, mode=Mode.SUBTRACT)

    # F31 (on face) → F32 (cut)
    with BuildSketch(Plane.XY.offset(5)):
        with Locations((35, -64.5)):
            Circle(F31_R)
        with Locations((35, 62.5)):
            Circle(F31_R)
        with Locations((-35, 62.5)):
            Circle(F31_R)
        with Locations((-35, -64.5)):
            Circle(F31_R)
    extrude(amount=-F32_DEPTH, mode=Mode.SUBTRACT)


solid = f1.part
